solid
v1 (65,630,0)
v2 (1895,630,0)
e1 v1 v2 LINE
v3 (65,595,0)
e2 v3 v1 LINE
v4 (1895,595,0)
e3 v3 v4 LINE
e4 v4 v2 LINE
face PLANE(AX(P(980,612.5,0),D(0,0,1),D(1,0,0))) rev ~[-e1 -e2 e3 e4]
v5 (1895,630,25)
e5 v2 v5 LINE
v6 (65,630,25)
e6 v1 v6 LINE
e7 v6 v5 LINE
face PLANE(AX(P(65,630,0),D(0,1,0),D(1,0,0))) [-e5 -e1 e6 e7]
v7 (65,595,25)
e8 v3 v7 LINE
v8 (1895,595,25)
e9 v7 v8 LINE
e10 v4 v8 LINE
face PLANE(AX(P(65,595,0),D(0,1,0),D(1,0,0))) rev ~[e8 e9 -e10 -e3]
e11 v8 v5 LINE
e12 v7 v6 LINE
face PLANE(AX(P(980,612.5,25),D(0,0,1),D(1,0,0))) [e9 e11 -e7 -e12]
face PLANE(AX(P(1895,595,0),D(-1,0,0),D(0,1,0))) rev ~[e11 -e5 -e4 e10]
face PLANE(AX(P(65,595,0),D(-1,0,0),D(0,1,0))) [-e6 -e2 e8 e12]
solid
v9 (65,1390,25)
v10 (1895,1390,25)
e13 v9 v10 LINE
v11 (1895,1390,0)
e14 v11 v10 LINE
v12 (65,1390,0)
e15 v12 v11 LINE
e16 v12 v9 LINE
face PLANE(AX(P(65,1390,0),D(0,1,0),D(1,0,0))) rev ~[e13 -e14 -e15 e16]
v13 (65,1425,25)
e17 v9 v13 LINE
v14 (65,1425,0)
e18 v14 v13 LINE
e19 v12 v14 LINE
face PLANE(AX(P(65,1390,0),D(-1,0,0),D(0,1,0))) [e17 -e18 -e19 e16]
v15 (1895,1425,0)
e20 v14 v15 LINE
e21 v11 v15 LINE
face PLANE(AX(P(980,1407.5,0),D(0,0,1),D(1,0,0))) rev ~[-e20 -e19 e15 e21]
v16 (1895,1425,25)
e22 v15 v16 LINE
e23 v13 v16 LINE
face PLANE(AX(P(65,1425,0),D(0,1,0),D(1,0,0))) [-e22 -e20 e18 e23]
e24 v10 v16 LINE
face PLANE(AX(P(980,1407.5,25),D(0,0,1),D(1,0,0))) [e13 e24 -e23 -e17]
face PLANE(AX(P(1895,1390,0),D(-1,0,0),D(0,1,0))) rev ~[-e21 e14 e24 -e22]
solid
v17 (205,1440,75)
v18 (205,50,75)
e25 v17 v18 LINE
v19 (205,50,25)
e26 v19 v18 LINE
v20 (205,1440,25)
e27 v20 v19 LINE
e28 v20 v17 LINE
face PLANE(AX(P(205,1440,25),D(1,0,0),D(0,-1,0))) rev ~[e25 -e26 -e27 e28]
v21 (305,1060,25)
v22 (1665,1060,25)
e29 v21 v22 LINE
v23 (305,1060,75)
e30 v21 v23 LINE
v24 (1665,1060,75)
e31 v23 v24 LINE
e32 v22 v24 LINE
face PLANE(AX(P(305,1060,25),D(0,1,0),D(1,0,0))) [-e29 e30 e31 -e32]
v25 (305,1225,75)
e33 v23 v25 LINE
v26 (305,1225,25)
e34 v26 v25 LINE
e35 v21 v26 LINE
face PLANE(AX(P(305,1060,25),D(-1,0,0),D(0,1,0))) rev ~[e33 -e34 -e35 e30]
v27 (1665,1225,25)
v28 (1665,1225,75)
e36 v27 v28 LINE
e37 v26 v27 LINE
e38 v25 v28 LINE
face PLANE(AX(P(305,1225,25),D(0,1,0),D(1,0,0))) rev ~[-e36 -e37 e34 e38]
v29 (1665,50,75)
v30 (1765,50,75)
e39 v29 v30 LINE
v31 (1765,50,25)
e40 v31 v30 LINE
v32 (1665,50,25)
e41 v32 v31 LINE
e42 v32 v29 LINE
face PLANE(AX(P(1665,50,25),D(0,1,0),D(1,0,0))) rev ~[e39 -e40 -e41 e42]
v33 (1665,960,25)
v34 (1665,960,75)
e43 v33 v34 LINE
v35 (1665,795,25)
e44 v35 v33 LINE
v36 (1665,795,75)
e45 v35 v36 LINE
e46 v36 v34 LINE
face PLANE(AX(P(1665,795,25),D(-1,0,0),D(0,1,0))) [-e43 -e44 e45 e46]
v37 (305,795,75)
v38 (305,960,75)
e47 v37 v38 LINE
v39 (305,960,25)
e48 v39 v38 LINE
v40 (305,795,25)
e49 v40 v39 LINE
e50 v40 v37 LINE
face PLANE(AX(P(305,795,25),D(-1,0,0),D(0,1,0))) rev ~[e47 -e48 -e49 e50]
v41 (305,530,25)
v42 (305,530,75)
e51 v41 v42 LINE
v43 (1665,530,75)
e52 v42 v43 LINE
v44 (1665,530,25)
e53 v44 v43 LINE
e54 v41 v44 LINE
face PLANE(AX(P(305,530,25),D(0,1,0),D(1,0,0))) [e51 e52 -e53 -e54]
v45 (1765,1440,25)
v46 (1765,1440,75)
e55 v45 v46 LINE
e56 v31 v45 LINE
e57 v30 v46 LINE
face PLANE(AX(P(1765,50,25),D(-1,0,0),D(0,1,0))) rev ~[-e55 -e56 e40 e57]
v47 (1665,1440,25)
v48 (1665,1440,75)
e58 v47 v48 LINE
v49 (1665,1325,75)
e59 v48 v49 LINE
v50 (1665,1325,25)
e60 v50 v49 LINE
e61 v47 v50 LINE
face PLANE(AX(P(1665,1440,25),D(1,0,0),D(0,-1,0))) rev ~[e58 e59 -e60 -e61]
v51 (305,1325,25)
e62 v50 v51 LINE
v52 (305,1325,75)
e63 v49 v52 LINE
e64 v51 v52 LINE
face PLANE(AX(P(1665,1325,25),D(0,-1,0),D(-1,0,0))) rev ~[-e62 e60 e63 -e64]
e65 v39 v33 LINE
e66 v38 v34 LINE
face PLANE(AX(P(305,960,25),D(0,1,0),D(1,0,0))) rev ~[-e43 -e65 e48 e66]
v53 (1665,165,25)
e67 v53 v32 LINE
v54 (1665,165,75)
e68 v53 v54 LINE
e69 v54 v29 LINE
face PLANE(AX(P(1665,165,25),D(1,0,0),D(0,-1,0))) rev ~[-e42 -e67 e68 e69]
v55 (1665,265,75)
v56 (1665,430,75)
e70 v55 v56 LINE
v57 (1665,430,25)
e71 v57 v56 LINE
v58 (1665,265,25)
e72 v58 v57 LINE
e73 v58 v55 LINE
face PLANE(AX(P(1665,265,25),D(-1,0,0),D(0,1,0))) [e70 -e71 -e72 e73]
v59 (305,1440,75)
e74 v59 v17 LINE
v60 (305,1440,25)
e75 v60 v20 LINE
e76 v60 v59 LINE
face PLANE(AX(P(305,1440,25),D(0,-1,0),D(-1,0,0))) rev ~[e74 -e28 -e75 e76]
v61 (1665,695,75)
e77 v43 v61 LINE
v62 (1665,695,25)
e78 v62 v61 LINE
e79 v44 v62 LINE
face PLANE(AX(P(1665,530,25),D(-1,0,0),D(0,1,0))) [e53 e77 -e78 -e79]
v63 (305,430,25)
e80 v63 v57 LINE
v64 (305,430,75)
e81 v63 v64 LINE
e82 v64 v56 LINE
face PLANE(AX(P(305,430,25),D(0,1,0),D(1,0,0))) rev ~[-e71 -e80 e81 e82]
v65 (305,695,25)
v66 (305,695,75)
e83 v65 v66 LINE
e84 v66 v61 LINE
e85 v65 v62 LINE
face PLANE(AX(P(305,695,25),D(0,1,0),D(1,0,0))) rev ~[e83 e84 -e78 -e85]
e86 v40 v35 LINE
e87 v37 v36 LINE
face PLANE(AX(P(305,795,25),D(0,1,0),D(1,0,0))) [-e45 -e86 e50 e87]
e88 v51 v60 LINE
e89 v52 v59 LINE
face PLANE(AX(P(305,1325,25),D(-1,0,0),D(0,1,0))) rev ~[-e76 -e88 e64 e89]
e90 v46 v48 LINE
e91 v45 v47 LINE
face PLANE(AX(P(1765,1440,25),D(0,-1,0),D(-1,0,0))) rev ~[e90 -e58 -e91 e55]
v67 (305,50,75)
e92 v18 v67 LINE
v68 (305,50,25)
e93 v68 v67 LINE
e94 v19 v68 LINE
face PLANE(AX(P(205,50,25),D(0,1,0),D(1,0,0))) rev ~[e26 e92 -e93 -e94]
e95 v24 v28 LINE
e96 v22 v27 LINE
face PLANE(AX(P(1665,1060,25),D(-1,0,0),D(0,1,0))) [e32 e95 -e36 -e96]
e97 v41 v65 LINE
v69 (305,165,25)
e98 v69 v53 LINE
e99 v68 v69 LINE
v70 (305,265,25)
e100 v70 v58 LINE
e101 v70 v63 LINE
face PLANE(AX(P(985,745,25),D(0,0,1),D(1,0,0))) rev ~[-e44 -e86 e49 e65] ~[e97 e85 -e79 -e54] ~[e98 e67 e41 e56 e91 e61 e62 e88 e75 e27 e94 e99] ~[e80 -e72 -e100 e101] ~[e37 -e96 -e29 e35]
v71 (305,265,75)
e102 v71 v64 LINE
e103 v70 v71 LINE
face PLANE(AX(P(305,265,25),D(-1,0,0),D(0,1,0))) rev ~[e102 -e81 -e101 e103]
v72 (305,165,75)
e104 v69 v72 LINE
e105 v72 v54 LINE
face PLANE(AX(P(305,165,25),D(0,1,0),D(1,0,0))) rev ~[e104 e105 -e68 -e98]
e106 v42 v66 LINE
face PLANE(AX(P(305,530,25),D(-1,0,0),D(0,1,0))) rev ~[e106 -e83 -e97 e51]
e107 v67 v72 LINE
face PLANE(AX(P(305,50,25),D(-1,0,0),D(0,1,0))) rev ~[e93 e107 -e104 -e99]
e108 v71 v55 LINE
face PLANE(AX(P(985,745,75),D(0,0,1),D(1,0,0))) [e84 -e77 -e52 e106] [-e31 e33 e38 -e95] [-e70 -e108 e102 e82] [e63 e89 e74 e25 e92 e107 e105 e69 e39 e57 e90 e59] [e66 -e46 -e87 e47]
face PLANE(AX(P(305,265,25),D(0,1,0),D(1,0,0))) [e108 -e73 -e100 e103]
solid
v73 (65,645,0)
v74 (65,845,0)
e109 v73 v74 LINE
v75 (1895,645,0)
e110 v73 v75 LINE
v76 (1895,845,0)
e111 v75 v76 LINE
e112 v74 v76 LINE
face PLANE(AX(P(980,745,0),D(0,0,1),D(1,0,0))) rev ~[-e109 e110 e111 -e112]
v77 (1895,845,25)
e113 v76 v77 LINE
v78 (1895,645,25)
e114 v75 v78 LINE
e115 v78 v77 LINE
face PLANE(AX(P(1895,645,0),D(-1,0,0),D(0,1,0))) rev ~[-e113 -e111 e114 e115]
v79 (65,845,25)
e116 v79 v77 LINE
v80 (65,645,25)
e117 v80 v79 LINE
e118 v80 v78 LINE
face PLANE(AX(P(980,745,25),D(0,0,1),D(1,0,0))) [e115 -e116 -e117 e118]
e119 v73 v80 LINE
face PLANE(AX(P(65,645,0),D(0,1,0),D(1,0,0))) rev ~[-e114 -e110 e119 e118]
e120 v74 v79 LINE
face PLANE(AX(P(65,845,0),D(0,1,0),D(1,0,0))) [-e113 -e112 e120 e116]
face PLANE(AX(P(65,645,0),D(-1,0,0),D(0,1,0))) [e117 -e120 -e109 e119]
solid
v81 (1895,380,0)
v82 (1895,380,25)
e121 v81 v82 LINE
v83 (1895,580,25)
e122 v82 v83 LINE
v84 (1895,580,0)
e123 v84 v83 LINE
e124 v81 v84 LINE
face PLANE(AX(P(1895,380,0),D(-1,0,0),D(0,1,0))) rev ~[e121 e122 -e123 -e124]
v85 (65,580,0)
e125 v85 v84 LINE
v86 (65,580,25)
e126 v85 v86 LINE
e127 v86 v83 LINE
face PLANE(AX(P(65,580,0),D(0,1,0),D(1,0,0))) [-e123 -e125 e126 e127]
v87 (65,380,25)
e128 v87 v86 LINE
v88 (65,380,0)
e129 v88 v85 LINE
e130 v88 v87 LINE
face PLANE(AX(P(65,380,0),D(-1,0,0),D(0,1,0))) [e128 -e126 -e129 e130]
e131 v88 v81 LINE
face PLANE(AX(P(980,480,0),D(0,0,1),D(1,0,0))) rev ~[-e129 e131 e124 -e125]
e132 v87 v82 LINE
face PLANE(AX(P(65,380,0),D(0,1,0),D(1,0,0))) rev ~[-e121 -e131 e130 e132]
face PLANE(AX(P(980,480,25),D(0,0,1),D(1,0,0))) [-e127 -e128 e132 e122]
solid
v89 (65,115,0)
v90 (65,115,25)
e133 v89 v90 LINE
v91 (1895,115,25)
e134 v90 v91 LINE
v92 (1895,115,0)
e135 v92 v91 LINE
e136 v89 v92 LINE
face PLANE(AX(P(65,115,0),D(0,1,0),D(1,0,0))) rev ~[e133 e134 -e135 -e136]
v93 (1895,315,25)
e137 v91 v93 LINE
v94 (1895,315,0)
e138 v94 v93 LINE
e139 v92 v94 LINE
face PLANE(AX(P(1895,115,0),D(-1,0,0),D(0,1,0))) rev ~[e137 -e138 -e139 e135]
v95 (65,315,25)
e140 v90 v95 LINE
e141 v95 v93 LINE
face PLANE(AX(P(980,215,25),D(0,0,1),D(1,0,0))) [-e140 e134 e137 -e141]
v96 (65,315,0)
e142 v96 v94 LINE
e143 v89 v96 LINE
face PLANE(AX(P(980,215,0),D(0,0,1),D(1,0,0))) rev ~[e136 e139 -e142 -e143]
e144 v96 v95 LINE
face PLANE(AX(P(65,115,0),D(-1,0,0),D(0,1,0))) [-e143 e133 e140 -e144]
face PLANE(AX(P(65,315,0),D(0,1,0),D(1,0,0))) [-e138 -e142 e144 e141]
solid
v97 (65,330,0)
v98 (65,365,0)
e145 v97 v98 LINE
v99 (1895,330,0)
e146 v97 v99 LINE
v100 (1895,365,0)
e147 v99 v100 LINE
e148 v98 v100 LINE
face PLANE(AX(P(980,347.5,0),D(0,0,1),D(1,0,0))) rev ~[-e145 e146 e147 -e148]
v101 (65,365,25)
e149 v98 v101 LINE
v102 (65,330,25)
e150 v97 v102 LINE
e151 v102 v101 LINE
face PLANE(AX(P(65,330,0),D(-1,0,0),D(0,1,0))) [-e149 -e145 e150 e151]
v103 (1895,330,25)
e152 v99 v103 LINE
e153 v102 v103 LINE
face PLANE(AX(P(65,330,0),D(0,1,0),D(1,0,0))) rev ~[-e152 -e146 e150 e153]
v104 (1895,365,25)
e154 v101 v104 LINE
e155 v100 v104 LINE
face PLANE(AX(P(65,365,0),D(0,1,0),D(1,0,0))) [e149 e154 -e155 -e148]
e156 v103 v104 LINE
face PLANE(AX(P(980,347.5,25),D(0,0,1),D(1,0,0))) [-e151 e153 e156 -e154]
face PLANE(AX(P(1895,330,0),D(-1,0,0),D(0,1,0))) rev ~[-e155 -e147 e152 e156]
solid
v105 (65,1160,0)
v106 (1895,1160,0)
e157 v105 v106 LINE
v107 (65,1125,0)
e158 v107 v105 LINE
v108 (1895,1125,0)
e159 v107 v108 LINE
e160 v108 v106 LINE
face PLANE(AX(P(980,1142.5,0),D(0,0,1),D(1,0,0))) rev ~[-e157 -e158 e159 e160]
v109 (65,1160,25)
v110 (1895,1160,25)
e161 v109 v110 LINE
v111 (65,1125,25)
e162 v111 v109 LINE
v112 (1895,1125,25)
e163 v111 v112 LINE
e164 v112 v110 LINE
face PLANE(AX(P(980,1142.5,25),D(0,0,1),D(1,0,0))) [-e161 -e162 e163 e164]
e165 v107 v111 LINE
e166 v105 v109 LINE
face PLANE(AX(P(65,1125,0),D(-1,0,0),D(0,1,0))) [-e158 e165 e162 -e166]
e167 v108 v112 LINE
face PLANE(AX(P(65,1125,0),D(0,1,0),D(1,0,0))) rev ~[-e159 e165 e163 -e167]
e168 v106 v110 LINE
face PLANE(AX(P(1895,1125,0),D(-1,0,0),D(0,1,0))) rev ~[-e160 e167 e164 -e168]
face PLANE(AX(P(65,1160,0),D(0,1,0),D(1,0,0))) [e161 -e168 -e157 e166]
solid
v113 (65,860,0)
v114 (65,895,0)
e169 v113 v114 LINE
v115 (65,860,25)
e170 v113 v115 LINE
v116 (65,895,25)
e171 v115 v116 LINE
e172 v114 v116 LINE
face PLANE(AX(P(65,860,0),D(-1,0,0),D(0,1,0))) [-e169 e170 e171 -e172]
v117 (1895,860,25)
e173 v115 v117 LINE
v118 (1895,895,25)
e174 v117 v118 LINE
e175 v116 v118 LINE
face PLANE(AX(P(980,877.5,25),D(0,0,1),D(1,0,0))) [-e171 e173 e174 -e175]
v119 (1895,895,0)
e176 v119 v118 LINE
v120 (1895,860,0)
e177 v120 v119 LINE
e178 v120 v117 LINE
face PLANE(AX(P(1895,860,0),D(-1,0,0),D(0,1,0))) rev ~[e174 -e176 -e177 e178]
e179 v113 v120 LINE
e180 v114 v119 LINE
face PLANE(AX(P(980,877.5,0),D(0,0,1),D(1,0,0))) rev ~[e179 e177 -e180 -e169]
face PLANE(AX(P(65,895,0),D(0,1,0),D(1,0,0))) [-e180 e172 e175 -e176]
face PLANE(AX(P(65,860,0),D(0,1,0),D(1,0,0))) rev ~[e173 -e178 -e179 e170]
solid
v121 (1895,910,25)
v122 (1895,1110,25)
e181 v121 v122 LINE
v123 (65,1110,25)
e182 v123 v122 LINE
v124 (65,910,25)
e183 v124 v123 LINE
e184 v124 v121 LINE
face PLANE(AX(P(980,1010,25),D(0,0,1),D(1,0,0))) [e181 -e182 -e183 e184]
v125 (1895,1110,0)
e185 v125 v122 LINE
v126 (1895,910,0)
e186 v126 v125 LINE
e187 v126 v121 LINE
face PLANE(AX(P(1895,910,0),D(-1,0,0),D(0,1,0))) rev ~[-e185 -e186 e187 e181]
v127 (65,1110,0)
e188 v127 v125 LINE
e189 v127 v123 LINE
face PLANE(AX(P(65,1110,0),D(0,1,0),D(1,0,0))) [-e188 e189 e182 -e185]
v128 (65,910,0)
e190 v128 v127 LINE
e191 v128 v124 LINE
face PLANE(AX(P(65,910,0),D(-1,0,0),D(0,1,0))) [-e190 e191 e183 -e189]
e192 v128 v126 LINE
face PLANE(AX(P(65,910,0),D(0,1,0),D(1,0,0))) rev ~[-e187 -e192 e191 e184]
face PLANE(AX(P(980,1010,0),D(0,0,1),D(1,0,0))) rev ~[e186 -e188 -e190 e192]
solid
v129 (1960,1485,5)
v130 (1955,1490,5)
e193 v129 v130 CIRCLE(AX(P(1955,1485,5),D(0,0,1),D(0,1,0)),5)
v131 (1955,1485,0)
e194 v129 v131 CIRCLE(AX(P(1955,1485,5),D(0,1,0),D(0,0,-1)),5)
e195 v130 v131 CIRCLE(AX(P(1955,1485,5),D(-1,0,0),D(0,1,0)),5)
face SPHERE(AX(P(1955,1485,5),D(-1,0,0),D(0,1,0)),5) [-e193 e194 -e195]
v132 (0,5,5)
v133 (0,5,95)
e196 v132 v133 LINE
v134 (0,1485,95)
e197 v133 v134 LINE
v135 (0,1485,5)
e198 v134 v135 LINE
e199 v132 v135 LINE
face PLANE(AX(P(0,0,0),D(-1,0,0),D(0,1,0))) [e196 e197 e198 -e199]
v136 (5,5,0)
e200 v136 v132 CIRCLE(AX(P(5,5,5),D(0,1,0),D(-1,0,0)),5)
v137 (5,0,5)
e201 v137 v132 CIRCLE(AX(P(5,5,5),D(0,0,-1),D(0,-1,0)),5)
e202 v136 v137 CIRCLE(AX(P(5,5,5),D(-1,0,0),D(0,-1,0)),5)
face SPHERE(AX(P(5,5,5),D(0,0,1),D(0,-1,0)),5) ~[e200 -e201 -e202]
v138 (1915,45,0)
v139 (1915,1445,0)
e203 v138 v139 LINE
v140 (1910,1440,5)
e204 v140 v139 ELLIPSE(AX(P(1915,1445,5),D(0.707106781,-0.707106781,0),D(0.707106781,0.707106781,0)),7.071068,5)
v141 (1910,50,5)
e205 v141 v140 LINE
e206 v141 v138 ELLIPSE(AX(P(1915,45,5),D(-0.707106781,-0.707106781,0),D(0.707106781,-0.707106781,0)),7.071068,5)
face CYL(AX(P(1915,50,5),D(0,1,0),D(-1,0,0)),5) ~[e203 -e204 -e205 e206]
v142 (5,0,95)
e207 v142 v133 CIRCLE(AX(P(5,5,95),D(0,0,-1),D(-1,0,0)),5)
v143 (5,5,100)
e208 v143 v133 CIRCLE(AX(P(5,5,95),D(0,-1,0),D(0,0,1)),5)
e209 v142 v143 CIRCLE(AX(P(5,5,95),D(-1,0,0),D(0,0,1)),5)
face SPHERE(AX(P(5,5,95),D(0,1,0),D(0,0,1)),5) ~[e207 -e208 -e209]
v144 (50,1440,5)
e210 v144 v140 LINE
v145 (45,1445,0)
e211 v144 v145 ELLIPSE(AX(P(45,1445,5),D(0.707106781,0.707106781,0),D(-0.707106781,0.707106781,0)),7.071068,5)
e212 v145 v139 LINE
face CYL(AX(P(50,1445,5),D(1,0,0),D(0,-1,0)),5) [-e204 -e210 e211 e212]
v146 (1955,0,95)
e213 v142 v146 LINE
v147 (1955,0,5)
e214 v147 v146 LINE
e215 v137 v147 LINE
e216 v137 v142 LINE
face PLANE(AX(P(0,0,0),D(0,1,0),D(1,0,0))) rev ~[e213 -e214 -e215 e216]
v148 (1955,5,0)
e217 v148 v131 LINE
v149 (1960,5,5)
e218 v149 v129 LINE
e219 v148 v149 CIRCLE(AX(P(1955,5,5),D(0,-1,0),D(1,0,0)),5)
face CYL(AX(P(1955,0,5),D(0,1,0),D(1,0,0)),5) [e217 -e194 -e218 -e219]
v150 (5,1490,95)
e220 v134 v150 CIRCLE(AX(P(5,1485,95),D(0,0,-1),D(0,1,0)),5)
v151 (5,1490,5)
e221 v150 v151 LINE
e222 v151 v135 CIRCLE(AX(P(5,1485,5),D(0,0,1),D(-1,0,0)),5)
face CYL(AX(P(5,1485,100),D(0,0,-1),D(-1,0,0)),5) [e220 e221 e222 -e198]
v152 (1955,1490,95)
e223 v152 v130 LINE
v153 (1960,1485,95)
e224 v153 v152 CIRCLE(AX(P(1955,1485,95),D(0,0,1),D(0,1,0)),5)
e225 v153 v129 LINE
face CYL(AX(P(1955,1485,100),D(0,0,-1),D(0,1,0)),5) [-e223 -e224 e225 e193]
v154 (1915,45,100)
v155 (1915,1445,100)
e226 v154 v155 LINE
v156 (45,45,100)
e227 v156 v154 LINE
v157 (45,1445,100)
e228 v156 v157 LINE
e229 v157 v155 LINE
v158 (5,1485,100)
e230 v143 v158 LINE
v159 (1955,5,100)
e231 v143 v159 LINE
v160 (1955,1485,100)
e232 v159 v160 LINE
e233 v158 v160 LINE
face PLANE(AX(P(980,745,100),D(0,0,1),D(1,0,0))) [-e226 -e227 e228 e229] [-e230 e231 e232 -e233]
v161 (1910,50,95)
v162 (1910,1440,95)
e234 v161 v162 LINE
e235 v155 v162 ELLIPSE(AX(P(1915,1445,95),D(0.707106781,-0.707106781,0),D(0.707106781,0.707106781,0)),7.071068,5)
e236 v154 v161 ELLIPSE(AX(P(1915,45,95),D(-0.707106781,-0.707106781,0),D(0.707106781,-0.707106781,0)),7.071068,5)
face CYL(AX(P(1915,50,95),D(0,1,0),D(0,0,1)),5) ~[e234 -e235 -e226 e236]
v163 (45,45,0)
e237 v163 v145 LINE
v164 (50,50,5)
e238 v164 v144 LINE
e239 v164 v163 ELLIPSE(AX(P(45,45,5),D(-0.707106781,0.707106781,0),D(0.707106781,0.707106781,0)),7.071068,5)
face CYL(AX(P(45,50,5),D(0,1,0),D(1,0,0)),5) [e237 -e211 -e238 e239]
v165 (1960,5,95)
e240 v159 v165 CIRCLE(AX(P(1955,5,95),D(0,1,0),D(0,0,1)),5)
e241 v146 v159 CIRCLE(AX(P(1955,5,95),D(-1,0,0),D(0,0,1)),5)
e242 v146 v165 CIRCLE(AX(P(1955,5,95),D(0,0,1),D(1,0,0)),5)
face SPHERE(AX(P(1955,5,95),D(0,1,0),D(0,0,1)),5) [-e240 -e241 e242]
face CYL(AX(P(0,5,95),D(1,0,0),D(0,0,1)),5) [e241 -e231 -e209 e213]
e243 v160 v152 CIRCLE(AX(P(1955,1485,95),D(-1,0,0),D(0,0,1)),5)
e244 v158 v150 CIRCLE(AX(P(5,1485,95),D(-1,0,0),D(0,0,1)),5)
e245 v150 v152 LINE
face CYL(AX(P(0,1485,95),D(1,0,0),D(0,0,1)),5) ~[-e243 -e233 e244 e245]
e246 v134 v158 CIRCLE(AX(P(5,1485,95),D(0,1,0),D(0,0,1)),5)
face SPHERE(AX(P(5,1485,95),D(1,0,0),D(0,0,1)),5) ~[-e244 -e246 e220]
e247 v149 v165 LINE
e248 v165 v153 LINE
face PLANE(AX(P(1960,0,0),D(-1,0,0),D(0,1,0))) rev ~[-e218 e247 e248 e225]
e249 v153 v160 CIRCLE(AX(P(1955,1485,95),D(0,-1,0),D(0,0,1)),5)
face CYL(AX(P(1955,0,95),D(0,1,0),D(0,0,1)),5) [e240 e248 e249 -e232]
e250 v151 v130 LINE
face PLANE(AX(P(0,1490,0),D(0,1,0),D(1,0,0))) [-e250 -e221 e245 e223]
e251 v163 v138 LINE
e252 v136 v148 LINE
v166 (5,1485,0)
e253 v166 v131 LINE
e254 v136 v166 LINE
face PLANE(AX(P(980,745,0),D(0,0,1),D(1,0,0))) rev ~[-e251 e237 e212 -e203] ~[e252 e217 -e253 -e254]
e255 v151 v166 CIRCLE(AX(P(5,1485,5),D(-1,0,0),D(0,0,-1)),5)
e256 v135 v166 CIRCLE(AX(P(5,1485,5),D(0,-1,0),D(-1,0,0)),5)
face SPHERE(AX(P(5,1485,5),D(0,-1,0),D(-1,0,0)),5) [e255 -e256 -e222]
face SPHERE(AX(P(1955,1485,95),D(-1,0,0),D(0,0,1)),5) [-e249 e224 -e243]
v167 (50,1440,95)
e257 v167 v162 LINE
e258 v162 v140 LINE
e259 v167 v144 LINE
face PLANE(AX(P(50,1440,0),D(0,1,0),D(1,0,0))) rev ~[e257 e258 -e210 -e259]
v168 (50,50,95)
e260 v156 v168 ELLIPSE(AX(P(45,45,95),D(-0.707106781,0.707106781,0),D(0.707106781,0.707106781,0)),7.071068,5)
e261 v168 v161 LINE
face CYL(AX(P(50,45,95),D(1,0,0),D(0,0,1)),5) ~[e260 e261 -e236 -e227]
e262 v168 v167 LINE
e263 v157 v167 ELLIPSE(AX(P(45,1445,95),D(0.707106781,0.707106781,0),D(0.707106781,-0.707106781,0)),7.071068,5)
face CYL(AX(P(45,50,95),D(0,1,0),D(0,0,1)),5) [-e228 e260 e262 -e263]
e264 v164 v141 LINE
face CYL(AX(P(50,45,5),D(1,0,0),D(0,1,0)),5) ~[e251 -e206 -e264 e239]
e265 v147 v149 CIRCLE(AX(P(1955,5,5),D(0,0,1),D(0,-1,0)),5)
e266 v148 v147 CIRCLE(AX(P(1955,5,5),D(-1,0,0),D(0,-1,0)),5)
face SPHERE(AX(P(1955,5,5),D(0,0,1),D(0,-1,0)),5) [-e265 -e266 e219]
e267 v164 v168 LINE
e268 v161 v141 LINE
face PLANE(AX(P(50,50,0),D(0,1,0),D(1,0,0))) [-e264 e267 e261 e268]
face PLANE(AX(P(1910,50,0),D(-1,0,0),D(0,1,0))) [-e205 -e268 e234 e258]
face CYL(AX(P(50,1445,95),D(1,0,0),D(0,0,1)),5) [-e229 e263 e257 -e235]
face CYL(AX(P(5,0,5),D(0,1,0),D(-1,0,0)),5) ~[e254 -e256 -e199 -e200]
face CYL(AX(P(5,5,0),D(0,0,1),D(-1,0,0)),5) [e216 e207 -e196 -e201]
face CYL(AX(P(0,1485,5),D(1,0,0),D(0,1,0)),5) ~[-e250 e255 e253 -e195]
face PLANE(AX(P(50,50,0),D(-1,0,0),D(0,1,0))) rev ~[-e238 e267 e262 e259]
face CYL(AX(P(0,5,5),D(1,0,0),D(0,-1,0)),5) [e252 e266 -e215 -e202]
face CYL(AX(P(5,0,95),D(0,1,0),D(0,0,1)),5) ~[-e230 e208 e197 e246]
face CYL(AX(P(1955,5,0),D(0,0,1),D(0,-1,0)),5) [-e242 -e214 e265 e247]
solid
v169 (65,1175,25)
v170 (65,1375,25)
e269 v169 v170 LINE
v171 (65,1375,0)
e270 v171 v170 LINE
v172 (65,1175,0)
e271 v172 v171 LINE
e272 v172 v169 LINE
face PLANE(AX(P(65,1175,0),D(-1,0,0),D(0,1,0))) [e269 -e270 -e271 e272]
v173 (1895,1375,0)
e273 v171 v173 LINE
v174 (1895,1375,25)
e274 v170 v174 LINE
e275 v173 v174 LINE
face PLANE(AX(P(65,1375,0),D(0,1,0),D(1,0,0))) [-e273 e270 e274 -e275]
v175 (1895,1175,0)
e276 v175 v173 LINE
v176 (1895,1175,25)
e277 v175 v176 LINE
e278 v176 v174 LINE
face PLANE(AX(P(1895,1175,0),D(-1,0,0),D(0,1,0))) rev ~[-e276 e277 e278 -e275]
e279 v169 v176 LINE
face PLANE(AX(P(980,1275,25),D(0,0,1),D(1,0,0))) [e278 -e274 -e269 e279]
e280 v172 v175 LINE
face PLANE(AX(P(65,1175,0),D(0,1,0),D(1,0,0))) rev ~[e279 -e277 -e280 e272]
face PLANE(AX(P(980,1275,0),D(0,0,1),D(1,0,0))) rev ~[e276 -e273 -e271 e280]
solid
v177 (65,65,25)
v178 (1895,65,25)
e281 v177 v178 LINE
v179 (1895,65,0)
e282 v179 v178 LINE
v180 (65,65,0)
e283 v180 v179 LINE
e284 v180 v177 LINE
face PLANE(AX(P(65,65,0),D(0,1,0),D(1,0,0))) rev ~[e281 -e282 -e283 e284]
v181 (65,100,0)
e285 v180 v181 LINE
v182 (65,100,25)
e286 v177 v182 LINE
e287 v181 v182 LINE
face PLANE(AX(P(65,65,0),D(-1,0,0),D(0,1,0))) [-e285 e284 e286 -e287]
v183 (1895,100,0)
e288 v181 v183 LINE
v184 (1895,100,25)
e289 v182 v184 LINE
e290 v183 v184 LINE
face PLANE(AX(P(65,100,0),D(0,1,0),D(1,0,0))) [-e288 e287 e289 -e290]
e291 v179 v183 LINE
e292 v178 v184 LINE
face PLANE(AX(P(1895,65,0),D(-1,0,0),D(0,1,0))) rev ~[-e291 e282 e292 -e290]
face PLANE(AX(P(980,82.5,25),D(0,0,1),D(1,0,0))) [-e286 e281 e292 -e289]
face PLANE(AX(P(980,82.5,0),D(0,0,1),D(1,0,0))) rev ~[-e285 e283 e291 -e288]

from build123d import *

# Parameters (mm, degrees)
F0_W     = 1960
F0_H     = 1490
F0_W_2   = 1860
F0_H_2   = 1390
F1_DEPTH = 100
F2_DEPTH = 25
F0_W_3   = 1830
F0_H_3   = 200
F0_H_4   = 35
F3_R     = 5
F4_R     = 5
F5_W     = 1360
F5_H     = 165
F6_DEPTH = 50


# Not quite as in the source:
# - a feature names something its author has since deleted; it is built from what else it names


with BuildPart() as f1:
    # F0 (on Top) → F1 (new body)
    with BuildSketch(Plane.XY):
        with Locations((980, 745)):
            Rectangle(F0_W, F0_H)
        with Locations((980, 745)):
            Rectangle(F0_W_2, F0_H_2, mode=Mode.SUBTRACT)
    extrude(amount=F1_DEPTH)

    # F0 (on Top) → F2 (join)
    with BuildSketch(Plane.XY):
        with Locations((980, 745)):
            Rectangle(F0_W, F0_H)
        with Locations((980, 745)):
            Rectangle(F0_W_2, F0_H_2, mode=Mode.SUBTRACT)
    extrude(amount=F2_DEPTH)

    # F3
    f3_edges = [f1.edges().sort_by_distance(p)[0] for p in [
        (980, 1440, 100),
        (50, 745, 100),
        (980, 50, 100),
        (1910, 745, 100),
    ]]
    fillet(f3_edges, radius=F3_R)

    # F4
    f4_edges = [f1.edges().sort_by_distance(p)[0] for p in [
        (980, 1490, 100),
        (0, 745, 100),
        (1960, 745, 100),
        (980, 0, 100),
        (1960, 0, 50),
        (0, 0, 50),
        (980, 0, 0),
        (0, 745, 0),
        (0, 1490, 50),
        (980, 1490, 0),
        (1960, 1490, 50),
        (1960, 745, 0),
        (50, 745, 0),
        (980, 1440, 0),
        (980, 50, 0),
        (1910, 745, 0),
    ]]
    fillet(f4_edges, radius=F4_R)


with BuildPart() as f2:
    # F0 (on Top) → F2, piece 2 (new body)
    with BuildSketch(Plane.XY):
        with Locations((980, 1275)):
            Rectangle(F0_W_3, F0_H_3)
    extrude(amount=F2_DEPTH)


with BuildPart() as f2b:
    # F0 (on Top) → F2, piece 3 (new body)
    with BuildSketch(Plane.XY):
        with Locations((980, 1010)):
            Rectangle(F0_W_3, F0_H_3)
    extrude(amount=F2_DEPTH)


with BuildPart() as f2c:
    # F0 (on Top) → F2, piece 4 (new body)
    with BuildSketch(Plane.XY):
        with Locations((980, 745)):
            Rectangle(F0_W_3, F0_H_3)
    extrude(amount=F2_DEPTH)


with BuildPart() as f2d:
    # F0 (on Top) → F2, piece 5 (new body)
    with BuildSketch(Plane.XY):
        with Locations((980, 480)):
            Rectangle(F0_W_3, F0_H_3)
    extrude(amount=F2_DEPTH)


with BuildPart() as f2e:
    # F0 (on Top) → F2, piece 6 (new body)
    with BuildSketch(Plane.XY):
        with Locations((980, 215)):
            Rectangle(F0_W_3, F0_H_3)
    extrude(amount=F2_DEPTH)


with BuildPart() as f2f:
    # F0 (on Top) → F2, piece 7 (new body)
    with BuildSketch(Plane.XY):
        with Locations((980, 82.5)):
            Rectangle(F0_W_3, F0_H_4)
    extrude(amount=F2_DEPTH)


with BuildPart() as f2g:
    # F0 (on Top) → F2, piece 8 (new body)
    with BuildSketch(Plane.XY):
        with Locations((980, 347.5)):
            Rectangle(F0_W_3, F0_H_4)
    extrude(amount=F2_DEPTH)


with BuildPart() as f2h:
    # F0 (on Top) → F2, piece 9 (new body)
    with BuildSketch(Plane.XY):
        with Locations((980, 612.5)):
            Rectangle(F0_W_3, F0_H_4)
    extrude(amount=F2_DEPTH)


with BuildPart() as f2i:
    # F0 (on Top) → F2, piece 10 (new body)
    with BuildSketch(Plane.XY):
        with Locations((980, 877.5)):
            Rectangle(F0_W_3, F0_H_4)
    extrude(amount=F2_DEPTH)


with BuildPart() as f2j:
    # F0 (on Top) → F2, piece 11 (new body)
    with BuildSketch(Plane.XY):
        with Locations((980, 1142.5)):
            Rectangle(F0_W_3, F0_H_4)
    extrude(amount=F2_DEPTH)


with BuildPart() as f2k:
    # F0 (on Top) → F2, piece 12 (new body)
    with BuildSketch(Plane.XY):
        with Locations((980, 1407.5)):
            Rectangle(F0_W_3, F0_H_4)
    extrude(amount=F2_DEPTH)


with BuildPart() as f6:
    # F5 (on face) → F6 (new body)
    with BuildSketch(Plane.XY.offset(25)):
        Polygon((205, 1440), (205, 50), (305, 50), (305, 165), (1665, 165), (1665, 50), (1765, 50), (1765, 1440), (1665, 1440), (1665, 1325), (305, 1325), (305, 1440), align=None)
        with Locations((985, 347.5)):
            Rectangle(F5_W, F5_H, mode=Mode.SUBTRACT)
        with Locations((985, 612.5)):
            Rectangle(F5_W, F5_H, mode=Mode.SUBTRACT)
        with Locations((985, 877.5)):
            Rectangle(F5_W, F5_H, mode=Mode.SUBTRACT)
        with Locations((985, 1142.5)):
            Rectangle(F5_W, F5_H, mode=Mode.SUBTRACT)
    extrude(amount=F6_DEPTH)


solid = Compound([f1.part, f2.part, f2b.part, f2c.part, f2d.part, f2e.part, f2f.part, f2g.part, f2h.part, f2i.part, f2j.part, f2k.part, f6.part])
